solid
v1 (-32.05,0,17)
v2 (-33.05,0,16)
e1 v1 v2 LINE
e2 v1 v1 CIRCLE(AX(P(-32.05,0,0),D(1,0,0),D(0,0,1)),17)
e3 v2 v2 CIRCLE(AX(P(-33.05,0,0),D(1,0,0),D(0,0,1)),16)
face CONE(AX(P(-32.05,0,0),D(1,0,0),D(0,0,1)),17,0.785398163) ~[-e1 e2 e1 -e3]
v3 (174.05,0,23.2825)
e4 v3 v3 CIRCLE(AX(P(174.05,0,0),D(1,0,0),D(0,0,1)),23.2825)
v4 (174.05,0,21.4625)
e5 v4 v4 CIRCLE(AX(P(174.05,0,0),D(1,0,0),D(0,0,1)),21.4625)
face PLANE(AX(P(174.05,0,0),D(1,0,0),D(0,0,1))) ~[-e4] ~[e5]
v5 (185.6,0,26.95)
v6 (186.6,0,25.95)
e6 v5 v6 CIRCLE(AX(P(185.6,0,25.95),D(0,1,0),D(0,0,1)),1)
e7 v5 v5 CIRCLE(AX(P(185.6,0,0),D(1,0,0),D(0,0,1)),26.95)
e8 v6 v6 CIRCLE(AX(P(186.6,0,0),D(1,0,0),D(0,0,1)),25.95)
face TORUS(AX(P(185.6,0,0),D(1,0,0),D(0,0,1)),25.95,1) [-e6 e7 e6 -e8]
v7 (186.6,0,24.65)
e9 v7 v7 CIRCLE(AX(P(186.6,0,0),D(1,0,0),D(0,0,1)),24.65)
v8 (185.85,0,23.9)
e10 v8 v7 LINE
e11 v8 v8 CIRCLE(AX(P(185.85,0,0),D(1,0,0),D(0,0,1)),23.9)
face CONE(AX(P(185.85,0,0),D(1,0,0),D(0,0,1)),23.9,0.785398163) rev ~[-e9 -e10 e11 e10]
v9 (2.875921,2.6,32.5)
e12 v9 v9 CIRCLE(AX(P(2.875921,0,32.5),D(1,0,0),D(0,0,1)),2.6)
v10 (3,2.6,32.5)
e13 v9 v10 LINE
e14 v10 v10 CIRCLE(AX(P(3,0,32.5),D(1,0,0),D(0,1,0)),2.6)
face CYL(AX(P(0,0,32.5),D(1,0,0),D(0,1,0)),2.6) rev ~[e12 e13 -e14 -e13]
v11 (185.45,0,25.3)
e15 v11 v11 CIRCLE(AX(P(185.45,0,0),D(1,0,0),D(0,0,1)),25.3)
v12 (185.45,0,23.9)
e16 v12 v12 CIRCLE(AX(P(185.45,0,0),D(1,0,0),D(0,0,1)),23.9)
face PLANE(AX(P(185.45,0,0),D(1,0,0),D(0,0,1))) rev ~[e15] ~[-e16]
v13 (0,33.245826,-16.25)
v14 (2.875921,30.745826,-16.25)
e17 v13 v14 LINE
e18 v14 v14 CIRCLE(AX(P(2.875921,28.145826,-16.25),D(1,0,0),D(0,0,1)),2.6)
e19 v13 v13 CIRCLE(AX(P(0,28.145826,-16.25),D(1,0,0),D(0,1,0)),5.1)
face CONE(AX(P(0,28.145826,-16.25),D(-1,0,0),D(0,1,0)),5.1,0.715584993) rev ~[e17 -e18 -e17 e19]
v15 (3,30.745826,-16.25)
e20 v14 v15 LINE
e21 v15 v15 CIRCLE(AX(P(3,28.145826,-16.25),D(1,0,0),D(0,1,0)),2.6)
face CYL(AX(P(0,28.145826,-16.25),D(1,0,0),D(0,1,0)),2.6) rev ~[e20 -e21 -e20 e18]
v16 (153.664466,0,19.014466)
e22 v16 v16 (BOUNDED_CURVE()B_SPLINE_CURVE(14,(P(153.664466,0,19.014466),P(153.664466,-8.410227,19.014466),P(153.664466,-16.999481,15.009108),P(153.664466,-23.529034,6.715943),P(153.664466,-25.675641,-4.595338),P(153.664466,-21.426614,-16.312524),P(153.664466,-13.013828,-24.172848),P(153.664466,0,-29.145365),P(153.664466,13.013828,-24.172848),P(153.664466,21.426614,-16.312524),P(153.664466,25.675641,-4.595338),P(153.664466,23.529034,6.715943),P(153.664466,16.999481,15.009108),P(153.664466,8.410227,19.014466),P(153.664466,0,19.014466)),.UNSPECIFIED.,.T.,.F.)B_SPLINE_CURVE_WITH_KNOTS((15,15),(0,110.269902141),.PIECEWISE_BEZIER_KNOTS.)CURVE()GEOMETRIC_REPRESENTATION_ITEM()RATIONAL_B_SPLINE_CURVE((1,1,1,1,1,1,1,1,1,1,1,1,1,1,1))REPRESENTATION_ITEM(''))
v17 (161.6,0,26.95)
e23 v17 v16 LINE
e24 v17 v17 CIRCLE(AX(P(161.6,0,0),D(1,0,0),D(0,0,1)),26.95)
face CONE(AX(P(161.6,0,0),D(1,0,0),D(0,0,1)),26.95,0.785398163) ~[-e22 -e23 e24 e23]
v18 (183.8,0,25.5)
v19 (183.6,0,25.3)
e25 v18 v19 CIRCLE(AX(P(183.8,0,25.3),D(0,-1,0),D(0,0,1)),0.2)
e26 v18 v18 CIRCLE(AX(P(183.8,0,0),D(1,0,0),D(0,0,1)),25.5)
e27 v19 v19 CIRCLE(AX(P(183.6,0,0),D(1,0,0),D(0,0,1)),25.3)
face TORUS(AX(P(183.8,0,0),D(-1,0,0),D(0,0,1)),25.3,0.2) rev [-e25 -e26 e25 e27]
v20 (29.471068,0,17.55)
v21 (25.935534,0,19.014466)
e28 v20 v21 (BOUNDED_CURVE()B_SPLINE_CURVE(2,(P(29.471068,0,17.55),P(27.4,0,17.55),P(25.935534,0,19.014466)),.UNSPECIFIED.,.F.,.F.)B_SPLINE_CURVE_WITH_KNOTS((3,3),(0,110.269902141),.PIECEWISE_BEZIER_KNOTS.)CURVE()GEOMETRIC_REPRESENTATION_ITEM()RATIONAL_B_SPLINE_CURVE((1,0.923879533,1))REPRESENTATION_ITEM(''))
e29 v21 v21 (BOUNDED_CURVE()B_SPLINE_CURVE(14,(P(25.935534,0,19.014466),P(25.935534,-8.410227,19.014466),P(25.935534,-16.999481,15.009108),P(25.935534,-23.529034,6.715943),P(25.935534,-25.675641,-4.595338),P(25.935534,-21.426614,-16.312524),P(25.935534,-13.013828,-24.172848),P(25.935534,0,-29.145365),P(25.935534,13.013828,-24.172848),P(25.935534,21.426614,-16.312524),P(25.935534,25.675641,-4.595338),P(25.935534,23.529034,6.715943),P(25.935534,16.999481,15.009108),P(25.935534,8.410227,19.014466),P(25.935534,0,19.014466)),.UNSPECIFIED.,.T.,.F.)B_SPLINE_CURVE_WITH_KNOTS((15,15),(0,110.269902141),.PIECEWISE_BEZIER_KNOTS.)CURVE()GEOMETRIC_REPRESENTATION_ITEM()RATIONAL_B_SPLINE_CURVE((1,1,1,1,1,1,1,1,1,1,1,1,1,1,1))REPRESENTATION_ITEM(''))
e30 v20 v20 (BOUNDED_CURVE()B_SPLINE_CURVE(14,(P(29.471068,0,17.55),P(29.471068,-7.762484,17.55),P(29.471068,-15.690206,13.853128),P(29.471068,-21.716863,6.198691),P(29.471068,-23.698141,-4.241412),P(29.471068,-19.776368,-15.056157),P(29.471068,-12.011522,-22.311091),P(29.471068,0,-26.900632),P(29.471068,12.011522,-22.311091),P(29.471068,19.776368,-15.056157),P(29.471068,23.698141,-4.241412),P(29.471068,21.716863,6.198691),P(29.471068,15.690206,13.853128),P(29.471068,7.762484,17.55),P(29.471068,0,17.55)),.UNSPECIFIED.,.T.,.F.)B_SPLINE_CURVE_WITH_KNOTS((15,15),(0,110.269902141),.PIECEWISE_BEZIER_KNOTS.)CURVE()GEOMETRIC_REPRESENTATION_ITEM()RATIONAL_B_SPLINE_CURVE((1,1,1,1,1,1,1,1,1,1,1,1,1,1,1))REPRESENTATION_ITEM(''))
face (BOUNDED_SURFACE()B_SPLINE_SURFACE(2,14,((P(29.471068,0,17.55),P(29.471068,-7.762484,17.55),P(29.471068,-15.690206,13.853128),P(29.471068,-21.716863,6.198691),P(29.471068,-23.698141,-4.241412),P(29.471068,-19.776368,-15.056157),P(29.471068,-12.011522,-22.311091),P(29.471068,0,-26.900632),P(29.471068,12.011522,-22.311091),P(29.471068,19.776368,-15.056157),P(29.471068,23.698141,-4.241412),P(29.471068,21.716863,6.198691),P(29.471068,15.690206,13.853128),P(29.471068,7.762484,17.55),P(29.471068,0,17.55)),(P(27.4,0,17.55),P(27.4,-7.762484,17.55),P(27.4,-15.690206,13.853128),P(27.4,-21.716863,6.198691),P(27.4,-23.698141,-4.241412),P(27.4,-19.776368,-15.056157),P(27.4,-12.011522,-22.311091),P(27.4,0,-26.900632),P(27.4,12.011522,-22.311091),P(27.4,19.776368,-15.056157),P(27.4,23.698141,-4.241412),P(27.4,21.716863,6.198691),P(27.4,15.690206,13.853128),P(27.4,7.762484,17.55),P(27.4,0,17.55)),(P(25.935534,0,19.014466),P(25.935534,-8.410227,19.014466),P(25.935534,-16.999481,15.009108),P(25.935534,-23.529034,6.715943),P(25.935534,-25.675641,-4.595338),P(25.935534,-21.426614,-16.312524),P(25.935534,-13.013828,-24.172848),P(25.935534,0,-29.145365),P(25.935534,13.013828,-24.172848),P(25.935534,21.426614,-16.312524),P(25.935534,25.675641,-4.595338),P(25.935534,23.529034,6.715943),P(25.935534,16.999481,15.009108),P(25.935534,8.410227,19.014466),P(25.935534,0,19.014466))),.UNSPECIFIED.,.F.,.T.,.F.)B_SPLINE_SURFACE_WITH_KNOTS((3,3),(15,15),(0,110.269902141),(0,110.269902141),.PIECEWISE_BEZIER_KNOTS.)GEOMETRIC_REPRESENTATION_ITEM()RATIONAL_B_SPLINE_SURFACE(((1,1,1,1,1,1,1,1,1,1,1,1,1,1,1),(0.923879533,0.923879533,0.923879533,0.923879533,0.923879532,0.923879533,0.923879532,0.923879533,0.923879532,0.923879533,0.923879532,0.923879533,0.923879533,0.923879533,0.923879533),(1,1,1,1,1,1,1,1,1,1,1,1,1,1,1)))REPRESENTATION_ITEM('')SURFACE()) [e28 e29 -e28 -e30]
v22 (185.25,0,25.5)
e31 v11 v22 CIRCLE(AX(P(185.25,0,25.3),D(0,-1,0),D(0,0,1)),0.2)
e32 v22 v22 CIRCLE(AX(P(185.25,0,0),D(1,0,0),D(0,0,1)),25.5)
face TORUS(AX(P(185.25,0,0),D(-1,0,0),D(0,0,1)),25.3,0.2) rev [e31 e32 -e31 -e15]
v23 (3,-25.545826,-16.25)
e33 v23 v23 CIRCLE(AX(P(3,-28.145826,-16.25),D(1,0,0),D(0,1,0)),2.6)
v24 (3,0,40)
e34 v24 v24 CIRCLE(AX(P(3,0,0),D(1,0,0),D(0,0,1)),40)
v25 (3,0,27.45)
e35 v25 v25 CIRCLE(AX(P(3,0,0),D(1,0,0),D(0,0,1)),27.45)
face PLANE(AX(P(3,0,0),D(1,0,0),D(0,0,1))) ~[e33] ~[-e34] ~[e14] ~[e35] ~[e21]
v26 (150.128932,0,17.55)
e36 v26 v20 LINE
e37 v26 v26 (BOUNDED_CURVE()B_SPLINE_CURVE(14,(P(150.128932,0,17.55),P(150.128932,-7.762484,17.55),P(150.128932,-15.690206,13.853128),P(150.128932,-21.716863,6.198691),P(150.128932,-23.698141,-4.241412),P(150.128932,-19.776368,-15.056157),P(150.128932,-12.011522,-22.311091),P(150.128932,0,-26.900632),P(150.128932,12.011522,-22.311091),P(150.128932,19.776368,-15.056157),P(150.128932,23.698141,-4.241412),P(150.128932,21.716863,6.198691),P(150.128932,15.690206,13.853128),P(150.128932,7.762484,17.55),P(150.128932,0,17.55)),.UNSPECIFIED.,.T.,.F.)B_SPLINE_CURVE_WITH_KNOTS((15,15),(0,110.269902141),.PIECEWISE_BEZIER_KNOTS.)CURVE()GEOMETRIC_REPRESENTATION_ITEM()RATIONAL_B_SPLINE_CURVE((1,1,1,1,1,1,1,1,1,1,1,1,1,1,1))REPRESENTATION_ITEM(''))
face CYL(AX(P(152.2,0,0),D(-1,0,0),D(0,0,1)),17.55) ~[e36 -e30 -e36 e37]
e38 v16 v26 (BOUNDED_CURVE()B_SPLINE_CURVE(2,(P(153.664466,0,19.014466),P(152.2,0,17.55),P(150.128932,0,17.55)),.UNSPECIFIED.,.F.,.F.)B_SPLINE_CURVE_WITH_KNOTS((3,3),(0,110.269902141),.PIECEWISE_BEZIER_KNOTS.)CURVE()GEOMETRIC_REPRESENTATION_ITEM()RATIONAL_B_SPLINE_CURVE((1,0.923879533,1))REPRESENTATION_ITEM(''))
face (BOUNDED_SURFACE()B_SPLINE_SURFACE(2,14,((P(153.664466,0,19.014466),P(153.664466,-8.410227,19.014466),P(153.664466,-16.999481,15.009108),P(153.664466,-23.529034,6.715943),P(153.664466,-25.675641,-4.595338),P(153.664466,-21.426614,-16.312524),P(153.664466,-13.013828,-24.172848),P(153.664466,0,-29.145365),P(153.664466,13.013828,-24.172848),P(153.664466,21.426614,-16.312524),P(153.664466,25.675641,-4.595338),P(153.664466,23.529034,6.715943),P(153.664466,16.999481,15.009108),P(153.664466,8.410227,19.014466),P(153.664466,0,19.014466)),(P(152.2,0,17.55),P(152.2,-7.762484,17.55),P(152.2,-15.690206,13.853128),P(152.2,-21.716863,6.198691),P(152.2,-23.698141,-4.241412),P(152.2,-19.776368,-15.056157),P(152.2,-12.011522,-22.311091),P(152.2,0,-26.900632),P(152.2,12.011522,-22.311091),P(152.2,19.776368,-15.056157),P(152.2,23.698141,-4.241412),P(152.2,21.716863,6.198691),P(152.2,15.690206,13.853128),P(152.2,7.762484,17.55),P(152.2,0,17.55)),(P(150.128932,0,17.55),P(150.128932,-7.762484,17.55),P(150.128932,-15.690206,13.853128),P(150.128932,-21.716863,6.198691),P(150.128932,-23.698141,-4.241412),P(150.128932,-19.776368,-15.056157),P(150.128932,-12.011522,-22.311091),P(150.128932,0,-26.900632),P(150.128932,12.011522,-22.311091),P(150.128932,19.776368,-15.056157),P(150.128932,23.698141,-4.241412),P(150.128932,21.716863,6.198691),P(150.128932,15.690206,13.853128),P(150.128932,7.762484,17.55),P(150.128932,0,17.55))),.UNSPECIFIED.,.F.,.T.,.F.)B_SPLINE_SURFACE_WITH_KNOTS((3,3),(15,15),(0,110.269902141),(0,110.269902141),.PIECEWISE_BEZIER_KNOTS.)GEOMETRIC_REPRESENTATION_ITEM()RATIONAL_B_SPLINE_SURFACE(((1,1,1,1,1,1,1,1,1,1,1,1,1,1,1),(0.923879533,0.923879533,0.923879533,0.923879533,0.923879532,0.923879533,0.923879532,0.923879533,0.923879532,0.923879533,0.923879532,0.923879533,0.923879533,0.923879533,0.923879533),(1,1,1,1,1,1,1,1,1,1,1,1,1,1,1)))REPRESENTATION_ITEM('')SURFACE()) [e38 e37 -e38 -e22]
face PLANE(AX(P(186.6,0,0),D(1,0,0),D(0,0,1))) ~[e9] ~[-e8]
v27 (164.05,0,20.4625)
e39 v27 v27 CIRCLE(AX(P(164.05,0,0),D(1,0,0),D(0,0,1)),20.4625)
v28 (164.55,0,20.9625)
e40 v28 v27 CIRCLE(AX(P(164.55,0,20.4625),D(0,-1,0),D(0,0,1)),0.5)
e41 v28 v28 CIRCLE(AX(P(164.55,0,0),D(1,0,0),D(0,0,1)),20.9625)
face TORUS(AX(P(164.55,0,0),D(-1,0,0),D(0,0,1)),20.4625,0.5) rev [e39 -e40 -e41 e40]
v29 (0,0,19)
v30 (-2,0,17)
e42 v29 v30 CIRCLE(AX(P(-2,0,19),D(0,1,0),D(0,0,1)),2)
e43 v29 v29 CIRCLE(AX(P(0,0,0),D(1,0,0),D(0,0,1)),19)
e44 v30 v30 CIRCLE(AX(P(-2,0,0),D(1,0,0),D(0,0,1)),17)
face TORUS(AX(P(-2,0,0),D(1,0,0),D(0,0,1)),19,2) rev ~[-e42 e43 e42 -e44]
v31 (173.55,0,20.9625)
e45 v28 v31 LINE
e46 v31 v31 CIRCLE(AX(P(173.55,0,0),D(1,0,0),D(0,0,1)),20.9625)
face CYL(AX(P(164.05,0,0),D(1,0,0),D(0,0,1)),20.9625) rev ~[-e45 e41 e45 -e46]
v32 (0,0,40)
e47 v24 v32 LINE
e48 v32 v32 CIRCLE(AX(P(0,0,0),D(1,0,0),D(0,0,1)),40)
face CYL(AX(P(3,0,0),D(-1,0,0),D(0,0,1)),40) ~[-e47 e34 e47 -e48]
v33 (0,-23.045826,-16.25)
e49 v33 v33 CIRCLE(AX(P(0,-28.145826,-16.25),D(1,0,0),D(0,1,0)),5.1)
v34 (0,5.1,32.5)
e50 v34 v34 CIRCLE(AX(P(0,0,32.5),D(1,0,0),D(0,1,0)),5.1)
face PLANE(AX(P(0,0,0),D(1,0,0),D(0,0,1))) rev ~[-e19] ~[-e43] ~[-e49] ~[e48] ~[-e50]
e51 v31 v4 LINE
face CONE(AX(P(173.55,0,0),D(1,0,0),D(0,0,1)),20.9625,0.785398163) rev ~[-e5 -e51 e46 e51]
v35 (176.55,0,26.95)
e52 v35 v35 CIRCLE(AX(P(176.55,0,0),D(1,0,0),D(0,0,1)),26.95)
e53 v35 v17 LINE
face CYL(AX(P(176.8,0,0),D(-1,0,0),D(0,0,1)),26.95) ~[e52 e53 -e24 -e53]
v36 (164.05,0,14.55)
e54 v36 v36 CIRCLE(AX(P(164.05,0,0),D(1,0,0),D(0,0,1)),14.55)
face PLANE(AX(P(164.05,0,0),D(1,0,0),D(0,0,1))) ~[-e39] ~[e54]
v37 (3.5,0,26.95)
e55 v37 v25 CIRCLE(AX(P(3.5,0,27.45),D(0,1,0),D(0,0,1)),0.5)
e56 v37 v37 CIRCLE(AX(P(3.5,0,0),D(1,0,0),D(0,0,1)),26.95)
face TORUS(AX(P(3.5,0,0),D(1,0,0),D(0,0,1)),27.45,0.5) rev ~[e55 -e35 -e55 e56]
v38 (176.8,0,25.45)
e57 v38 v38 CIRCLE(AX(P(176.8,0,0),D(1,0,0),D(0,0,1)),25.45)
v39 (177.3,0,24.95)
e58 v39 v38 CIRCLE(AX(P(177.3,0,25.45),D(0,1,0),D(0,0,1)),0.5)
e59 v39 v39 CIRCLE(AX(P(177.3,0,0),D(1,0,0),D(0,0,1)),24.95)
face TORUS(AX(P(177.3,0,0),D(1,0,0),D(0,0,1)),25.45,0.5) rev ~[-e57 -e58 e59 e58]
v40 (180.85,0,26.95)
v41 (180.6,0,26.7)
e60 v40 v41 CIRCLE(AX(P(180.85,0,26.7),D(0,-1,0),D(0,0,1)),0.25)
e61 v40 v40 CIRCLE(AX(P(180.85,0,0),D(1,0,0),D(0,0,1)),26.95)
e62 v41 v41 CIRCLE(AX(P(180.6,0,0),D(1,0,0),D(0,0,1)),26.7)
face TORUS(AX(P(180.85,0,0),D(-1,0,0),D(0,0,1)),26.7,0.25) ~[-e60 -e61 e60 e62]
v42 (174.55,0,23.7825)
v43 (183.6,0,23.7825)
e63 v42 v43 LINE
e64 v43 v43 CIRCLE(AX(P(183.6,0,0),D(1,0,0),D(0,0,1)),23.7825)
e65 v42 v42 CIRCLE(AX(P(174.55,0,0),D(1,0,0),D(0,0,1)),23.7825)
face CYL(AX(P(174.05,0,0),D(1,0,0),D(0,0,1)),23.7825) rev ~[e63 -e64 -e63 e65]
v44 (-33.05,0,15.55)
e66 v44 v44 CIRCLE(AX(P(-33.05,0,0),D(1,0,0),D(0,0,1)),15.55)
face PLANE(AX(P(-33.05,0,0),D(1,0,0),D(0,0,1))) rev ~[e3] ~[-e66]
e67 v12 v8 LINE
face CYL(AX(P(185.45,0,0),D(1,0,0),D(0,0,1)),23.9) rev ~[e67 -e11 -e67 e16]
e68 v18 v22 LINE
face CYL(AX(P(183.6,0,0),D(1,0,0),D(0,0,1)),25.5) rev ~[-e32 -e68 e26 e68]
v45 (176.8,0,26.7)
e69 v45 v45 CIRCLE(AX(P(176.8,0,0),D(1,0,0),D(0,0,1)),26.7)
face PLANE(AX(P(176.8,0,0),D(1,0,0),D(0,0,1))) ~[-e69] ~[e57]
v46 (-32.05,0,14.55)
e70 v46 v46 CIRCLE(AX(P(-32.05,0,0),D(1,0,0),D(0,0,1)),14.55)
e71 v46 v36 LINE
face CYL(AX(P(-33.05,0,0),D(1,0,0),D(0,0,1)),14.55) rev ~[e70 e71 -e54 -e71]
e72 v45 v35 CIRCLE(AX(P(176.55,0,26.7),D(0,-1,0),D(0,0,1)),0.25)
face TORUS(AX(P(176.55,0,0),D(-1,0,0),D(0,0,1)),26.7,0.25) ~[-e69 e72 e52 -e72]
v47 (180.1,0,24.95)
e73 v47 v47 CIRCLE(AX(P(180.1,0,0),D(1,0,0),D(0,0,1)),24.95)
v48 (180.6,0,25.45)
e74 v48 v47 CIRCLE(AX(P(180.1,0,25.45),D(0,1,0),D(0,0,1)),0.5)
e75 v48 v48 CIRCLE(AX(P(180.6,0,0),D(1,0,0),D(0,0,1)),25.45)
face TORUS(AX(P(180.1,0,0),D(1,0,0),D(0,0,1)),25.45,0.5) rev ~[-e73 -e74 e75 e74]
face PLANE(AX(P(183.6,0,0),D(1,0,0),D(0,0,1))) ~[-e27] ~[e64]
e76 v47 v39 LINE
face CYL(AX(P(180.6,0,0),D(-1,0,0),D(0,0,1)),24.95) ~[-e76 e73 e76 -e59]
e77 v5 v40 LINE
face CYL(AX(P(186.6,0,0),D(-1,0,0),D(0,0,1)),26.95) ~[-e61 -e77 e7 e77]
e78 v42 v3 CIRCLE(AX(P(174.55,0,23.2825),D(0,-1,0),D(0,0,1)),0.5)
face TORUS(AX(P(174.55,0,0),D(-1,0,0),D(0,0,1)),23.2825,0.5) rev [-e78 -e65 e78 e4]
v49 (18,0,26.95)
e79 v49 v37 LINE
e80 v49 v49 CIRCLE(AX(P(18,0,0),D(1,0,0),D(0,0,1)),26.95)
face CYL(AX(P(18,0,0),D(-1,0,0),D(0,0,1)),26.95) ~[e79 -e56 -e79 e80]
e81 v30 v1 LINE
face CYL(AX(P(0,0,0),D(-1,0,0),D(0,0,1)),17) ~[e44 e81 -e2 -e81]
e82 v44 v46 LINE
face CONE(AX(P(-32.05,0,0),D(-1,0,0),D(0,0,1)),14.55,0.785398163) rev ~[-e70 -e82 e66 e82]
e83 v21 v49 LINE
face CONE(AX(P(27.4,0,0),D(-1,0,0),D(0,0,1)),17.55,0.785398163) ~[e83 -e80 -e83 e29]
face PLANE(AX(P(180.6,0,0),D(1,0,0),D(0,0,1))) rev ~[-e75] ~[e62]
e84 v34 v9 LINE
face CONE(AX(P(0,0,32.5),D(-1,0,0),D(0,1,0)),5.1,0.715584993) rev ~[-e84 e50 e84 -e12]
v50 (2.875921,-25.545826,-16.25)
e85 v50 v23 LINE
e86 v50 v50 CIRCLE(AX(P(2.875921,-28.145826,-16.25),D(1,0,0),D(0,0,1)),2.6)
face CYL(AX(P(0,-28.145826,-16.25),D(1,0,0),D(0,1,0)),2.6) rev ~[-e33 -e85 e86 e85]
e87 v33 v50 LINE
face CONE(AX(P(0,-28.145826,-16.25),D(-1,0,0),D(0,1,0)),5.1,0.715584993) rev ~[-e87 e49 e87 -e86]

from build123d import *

# Parameters (mm, degrees)
F3_D           = 5.2
F3_DEPTH       = 100
F3_CSINK_D     = 10.2
F3_CSINK_ANGLE = 82
F3_TIP         = 1.5622376095
F4_R           = 5
F5_R           = 0.5
F6_R           = 2
F7_SIZE        = 1
F8_SIZE        = 0.75
F9_R           = 0.2
F10_R          = 0.5
F11_R          = 0.5
F12_SIZE       = 0.5
F13_R          = 0.25
F14_R          = 0.5
F15_R          = 1


with BuildPart() as f1:
    # F0 (on Front) → F1 (revolve)
    with BuildSketch(Plane.XZ):
        Polygon((-33.05, 14.55), (164.05, 14.55), (164.05, 20.9625), (174.05, 20.9625), (174.05, 23.7825), (183.6, 23.7825), (183.6, 25.5), (185.45, 25.5), (185.45, 23.9), (186.6, 23.9), (186.6, 26.95), (180.6, 26.95), (180.6, 24.95), (176.8, 24.95), (176.8, 26.95), (161.6, 26.95), (152.2, 17.55), (27.4, 17.55), (18, 26.95), (3, 26.95), (3, 40), (0, 40), (0, 22.8), (0, 17), (-33.05, 17), align=None)
    revolve(axis=Axis((35.5394743383, 0, 0), (1, 0, 0)))

    # F3
    with Locations(Plane(origin=(0, 0, 0), x_dir=(0, -1, 0), z_dir=(-1, 0, 0))):
        with Locations((-28.145825623, -16.25), (28.145825623, -16.25), (0, 32.5)):
            CounterSinkHole(F3_D / 2, F3_CSINK_D / 2, depth=F3_DEPTH, counter_sink_angle=F3_CSINK_ANGLE)
            with Locations((0, 0, -(F3_DEPTH + F3_TIP / 2))):  # 118° drill point
                Cone(0, F3_D / 2, F3_TIP, mode=Mode.SUBTRACT)

    # F4
    f4_edges = [f1.edges().sort_by_distance(p)[0] for p in [
        (27.4, 0, -17.55),
        (152.2, 0, -17.55),
    ]]
    fillet(f4_edges, radius=F4_R)

    # F5
    f5_edges = [f1.edges().sort_by_distance(p)[0] for p in [
        (3, 0, -26.95),
    ]]
    fillet(f5_edges, radius=F5_R)

    # F6
    f6_edges = [f1.edges().sort_by_distance(p)[0] for p in [
        (0, 0, -17),
    ]]
    fillet(f6_edges, radius=F6_R)

    # F7
    f7_edges = [f1.edges().sort_by_distance(p)[0] for p in [
        (-33.05, 0, -17),
        (-33.05, 0, -14.55),
    ]]
    chamfer(f7_edges, length=F7_SIZE)

    # F8
    f8_edges = [f1.edges().sort_by_distance(p)[0] for p in [
        (186.6, 0, -23.9),
    ]]
    chamfer(f8_edges, length=F8_SIZE)

    # F9
    f9_edges = [f1.edges().sort_by_distance(p)[0] for p in [
        (183.6, 0, -25.5),
        (185.45, 0, -25.5),
    ]]
    fillet(f9_edges, radius=F9_R)

    # F10
    f10_edges = [f1.edges().sort_by_distance(p)[0] for p in [
        (174.05, 0, -23.7825),
    ]]
    fillet(f10_edges, radius=F10_R)

    # F11
    f11_edges = [f1.edges().sort_by_distance(p)[0] for p in [
        (164.05, 0, -20.9625),
    ]]
    fillet(f11_edges, radius=F11_R)

    # F12
    f12_edges = [f1.edges().sort_by_distance(p)[0] for p in [
        (174.05, 0, -20.9625),
    ]]
    chamfer(f12_edges, length=F12_SIZE)

    # F13
    f13_edges = [f1.edges().sort_by_distance(p)[0] for p in [
        (176.8, 0, -26.95),
        (180.6, 0, -26.95),
    ]]
    fillet(f13_edges, radius=F13_R)

    # F14
    f14_edges = [f1.edges().sort_by_distance(p)[0] for p in [
        (176.8, 0, -24.95),
        (180.6, 0, -24.95),
    ]]
    fillet(f14_edges, radius=F14_R)

    # F15
    f15_edges = [f1.edges().sort_by_distance(p)[0] for p in [
        (186.6, 0, -26.95),
    ]]
    fillet(f15_edges, radius=F15_R)


solid = f1.part
